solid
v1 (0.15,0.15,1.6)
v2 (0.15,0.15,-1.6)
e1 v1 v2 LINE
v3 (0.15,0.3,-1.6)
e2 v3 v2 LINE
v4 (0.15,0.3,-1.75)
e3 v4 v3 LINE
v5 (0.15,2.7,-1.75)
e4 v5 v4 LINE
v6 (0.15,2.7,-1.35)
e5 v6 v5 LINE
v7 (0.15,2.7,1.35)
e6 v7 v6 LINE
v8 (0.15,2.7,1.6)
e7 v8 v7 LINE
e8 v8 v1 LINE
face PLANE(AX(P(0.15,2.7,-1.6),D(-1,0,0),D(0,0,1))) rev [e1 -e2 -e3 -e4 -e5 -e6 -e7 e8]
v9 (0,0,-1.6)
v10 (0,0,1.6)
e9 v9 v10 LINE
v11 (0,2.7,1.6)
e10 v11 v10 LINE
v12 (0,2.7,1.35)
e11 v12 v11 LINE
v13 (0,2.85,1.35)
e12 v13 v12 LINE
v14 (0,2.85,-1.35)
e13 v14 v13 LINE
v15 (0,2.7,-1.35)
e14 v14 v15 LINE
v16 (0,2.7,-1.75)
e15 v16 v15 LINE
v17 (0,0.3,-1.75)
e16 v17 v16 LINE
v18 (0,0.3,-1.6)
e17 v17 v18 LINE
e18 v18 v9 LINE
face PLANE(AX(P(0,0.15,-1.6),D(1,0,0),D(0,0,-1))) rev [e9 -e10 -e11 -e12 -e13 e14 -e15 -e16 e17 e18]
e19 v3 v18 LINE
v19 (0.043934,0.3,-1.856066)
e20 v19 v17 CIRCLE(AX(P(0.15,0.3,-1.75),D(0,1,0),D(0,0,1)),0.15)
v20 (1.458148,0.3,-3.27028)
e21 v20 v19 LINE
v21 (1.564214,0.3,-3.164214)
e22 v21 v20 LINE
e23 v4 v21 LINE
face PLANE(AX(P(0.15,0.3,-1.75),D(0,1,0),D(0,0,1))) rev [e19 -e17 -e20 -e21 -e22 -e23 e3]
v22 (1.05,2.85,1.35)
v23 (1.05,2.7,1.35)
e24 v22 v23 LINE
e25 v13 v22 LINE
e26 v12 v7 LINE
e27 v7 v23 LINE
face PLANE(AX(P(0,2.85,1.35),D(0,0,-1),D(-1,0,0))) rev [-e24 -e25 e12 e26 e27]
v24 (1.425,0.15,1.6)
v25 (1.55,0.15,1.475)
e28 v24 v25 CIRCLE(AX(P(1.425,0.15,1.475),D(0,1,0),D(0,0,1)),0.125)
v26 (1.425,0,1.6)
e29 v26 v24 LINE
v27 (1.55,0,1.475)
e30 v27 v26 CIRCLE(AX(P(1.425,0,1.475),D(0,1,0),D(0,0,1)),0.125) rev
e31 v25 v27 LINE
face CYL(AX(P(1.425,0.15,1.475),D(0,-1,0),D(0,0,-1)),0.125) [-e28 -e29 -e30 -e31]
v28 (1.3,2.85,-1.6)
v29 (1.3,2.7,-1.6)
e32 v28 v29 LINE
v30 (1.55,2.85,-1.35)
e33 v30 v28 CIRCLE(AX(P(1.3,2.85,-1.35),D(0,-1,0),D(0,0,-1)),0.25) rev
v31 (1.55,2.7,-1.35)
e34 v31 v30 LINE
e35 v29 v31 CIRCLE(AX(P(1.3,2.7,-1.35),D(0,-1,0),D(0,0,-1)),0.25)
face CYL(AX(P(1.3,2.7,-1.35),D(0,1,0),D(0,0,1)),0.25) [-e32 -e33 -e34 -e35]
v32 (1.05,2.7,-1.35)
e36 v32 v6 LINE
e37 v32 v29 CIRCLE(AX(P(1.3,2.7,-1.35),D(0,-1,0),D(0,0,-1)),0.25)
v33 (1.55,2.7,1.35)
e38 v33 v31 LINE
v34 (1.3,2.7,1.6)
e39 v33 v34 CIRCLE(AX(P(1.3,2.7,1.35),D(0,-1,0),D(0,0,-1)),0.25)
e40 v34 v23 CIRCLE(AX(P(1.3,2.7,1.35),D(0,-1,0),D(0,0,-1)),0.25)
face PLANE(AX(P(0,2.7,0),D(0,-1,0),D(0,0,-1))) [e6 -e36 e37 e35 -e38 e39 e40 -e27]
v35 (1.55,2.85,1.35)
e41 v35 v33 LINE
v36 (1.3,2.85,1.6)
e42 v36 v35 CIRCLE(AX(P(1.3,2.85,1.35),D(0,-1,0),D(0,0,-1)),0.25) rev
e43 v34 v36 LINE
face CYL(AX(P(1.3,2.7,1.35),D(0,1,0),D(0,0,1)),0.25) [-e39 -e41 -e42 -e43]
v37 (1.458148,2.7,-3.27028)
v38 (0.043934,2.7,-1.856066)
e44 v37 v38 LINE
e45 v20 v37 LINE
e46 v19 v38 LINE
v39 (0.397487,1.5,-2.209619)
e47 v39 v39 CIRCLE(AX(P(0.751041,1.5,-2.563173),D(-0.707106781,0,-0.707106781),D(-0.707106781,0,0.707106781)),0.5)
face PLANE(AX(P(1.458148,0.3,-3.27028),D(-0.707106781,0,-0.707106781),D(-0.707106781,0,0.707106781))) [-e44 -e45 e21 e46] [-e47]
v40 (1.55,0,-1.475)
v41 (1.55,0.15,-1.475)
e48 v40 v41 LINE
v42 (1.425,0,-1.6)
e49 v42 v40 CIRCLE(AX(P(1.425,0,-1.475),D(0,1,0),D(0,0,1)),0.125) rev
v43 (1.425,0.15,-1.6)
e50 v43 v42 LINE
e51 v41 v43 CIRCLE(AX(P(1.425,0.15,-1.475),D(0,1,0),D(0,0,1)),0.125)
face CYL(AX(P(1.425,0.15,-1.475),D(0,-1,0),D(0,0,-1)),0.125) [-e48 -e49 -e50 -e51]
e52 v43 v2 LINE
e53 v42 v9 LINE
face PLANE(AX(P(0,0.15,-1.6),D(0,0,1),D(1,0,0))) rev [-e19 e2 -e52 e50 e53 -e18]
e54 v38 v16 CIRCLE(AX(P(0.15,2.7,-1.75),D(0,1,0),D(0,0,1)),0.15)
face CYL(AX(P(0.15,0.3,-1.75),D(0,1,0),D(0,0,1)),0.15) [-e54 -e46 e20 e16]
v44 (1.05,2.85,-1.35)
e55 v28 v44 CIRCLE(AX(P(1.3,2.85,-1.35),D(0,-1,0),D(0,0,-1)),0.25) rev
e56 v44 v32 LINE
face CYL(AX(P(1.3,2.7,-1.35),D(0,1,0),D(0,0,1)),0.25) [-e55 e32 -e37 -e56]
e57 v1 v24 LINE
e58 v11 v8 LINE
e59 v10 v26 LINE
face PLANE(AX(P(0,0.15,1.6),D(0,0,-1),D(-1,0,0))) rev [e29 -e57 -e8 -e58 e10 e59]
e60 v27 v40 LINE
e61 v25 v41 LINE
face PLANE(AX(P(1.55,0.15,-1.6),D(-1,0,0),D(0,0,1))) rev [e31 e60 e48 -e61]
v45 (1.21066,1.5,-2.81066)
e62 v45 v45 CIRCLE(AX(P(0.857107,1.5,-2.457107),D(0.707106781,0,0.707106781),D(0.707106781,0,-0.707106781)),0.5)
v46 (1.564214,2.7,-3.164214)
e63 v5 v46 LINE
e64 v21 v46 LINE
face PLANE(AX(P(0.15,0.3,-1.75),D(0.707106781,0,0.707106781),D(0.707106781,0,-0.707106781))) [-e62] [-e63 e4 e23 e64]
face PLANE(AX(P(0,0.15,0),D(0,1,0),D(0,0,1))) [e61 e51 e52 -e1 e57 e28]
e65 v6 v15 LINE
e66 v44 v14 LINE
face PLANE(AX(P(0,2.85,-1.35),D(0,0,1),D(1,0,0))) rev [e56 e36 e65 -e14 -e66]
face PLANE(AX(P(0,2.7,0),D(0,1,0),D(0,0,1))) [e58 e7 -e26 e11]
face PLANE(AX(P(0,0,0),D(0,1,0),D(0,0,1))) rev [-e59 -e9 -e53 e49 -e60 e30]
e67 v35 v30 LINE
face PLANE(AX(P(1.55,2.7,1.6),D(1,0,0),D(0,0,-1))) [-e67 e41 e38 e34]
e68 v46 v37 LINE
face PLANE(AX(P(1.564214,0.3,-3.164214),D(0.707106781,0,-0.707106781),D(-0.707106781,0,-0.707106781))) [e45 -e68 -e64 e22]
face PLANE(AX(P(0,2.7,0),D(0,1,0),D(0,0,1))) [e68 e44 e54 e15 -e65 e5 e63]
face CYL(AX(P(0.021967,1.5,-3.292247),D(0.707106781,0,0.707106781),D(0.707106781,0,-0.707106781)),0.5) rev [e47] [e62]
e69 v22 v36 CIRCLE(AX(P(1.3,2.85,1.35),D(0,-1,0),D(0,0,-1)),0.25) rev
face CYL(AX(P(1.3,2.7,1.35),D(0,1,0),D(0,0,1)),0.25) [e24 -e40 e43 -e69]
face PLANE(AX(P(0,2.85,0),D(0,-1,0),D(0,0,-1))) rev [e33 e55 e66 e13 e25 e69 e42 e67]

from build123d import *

# Parameters (mm, degrees)
SKETCH1_W           = 1.55
SKETCH1_H           = 3.2
BOSS_EXTRUDE1_DEPTH = 0.15
FILLET1_R           = 0.125
SKETCH2_W           = 0.15
SKETCH2_H           = 3.2
BOSS_EXTRUDE2_DEPTH = 2.55
SKETCH3_W           = 0.15
SKETCH3_H           = 2.4
BOSS_EXTRUDE3_DEPTH = 0.15
BOSS_EXTRUDE4_DEPTH = 2.4
SKETCH5_R           = 0.5
CUT_EXTRUDE1_DEPTH  = 5.356809265
SKETCH6_W           = 1.05
SKETCH6_H           = 2.7
BOSS_EXTRUDE5_DEPTH = 0.15
SKETCH7_W           = 0.5
SKETCH7_H           = 3.2
BOSS_EXTRUDE6_DEPTH = 0.15
FILLET2_R           = 0.25


with BuildPart() as part:
    # Sketch1 → Boss-Extrude1 (new body)
    with BuildSketch(Plane(origin=(0, 0, 0), x_dir=(1, 0, 0), z_dir=(0, 1, 0))):
        with Locations((0.775, 0)):
            Rectangle(SKETCH1_W, SKETCH1_H)
    extrude(amount=BOSS_EXTRUDE1_DEPTH)

    # Fillet1
    fillet1_edges = [part.edges().sort_by_distance(p)[0] for p in [
        (1.55, 0.075, -1.6),
        (1.55, 0.075, 1.6),
    ]]
    fillet(fillet1_edges, radius=FILLET1_R)

    # Sketch2 → Boss-Extrude2 (add)
    with BuildSketch(Plane(origin=(0, 0.15, 0), x_dir=(1, 0, 0), z_dir=(0, 1, 0))):
        with Locations((0.075, 0)):
            Rectangle(SKETCH2_W, SKETCH2_H)
    extrude(amount=BOSS_EXTRUDE2_DEPTH)

    # Sketch3 → Boss-Extrude3 (add)
    with BuildSketch(Plane(origin=(0, 0, -1.6), x_dir=(-1, 0, 0), z_dir=(0, 0, -1))):
        with Locations((-0.075, 1.5)):
            Rectangle(SKETCH3_W, SKETCH3_H)
    extrude(amount=BOSS_EXTRUDE3_DEPTH)

    # Sketch4 → Boss-Extrude4 (add)
    with BuildSketch(Plane(origin=(0, 2.7, 0), x_dir=(1, 0, 0), z_dir=(0, 1, 0))):
        with BuildLine():
            Line((0.15, 1.75), (1.564213562, 3.164213562))
            Line((1.564213562, 3.164213562), (1.458147545, 3.27027958))
            Line((1.458147545, 3.27027958), (0.043933983, 1.856066017))
            ThreePointArc((0.043933983, 1.856066017), (0.01141807, 1.807402515), (0, 1.75))
            Line((0, 1.75), (0.15, 1.75))
        make_face()
    extrude(amount=-BOSS_EXTRUDE4_DEPTH)

    # Sketch5 → Cut-Extrude1 (cut, through all)
    with BuildSketch(Plane(origin=(-0.8, 0, -0.8), x_dir=(0.7071067811865511, 0, -0.7071067811865439), z_dir=(0.7071067811865439, 0, 0.7071067811865511))):
        with Locations((2.343502884, 1.5)):
            Circle(SKETCH5_R)
    extrude(amount=-CUT_EXTRUDE1_DEPTH, mode=Mode.SUBTRACT)

    # Sketch6 → Boss-Extrude5 (add)
    with BuildSketch(Plane(origin=(0, 2.7, 0), x_dir=(1, 0, 0), z_dir=(0, 1, 0))):
        with Locations((0.525, 0)):
            Rectangle(SKETCH6_W, SKETCH6_H)
    extrude(amount=BOSS_EXTRUDE5_DEPTH)

    # Sketch7 → Boss-Extrude6 (add)
    with BuildSketch(Plane(origin=(0, 2.85, 0), x_dir=(1, 0, 0), z_dir=(0, 1, 0))):
        with Locations((1.3, 0)):
            Rectangle(SKETCH7_W, SKETCH7_H)
    extrude(amount=-BOSS_EXTRUDE6_DEPTH)

    # Fillet2
    fillet2_edges = [part.edges().sort_by_distance(p)[0] for p in [
        (1.05, 2.775, -1.6),
        (1.55, 2.775, -1.6),
        (1.05, 2.775, 1.6),
        (1.55, 2.775, 1.6),
    ]]
    fillet(fillet2_edges, radius=FILLET2_R - 0.0001)  # a hair under: the kernel refuses the full size


solid = part.part
